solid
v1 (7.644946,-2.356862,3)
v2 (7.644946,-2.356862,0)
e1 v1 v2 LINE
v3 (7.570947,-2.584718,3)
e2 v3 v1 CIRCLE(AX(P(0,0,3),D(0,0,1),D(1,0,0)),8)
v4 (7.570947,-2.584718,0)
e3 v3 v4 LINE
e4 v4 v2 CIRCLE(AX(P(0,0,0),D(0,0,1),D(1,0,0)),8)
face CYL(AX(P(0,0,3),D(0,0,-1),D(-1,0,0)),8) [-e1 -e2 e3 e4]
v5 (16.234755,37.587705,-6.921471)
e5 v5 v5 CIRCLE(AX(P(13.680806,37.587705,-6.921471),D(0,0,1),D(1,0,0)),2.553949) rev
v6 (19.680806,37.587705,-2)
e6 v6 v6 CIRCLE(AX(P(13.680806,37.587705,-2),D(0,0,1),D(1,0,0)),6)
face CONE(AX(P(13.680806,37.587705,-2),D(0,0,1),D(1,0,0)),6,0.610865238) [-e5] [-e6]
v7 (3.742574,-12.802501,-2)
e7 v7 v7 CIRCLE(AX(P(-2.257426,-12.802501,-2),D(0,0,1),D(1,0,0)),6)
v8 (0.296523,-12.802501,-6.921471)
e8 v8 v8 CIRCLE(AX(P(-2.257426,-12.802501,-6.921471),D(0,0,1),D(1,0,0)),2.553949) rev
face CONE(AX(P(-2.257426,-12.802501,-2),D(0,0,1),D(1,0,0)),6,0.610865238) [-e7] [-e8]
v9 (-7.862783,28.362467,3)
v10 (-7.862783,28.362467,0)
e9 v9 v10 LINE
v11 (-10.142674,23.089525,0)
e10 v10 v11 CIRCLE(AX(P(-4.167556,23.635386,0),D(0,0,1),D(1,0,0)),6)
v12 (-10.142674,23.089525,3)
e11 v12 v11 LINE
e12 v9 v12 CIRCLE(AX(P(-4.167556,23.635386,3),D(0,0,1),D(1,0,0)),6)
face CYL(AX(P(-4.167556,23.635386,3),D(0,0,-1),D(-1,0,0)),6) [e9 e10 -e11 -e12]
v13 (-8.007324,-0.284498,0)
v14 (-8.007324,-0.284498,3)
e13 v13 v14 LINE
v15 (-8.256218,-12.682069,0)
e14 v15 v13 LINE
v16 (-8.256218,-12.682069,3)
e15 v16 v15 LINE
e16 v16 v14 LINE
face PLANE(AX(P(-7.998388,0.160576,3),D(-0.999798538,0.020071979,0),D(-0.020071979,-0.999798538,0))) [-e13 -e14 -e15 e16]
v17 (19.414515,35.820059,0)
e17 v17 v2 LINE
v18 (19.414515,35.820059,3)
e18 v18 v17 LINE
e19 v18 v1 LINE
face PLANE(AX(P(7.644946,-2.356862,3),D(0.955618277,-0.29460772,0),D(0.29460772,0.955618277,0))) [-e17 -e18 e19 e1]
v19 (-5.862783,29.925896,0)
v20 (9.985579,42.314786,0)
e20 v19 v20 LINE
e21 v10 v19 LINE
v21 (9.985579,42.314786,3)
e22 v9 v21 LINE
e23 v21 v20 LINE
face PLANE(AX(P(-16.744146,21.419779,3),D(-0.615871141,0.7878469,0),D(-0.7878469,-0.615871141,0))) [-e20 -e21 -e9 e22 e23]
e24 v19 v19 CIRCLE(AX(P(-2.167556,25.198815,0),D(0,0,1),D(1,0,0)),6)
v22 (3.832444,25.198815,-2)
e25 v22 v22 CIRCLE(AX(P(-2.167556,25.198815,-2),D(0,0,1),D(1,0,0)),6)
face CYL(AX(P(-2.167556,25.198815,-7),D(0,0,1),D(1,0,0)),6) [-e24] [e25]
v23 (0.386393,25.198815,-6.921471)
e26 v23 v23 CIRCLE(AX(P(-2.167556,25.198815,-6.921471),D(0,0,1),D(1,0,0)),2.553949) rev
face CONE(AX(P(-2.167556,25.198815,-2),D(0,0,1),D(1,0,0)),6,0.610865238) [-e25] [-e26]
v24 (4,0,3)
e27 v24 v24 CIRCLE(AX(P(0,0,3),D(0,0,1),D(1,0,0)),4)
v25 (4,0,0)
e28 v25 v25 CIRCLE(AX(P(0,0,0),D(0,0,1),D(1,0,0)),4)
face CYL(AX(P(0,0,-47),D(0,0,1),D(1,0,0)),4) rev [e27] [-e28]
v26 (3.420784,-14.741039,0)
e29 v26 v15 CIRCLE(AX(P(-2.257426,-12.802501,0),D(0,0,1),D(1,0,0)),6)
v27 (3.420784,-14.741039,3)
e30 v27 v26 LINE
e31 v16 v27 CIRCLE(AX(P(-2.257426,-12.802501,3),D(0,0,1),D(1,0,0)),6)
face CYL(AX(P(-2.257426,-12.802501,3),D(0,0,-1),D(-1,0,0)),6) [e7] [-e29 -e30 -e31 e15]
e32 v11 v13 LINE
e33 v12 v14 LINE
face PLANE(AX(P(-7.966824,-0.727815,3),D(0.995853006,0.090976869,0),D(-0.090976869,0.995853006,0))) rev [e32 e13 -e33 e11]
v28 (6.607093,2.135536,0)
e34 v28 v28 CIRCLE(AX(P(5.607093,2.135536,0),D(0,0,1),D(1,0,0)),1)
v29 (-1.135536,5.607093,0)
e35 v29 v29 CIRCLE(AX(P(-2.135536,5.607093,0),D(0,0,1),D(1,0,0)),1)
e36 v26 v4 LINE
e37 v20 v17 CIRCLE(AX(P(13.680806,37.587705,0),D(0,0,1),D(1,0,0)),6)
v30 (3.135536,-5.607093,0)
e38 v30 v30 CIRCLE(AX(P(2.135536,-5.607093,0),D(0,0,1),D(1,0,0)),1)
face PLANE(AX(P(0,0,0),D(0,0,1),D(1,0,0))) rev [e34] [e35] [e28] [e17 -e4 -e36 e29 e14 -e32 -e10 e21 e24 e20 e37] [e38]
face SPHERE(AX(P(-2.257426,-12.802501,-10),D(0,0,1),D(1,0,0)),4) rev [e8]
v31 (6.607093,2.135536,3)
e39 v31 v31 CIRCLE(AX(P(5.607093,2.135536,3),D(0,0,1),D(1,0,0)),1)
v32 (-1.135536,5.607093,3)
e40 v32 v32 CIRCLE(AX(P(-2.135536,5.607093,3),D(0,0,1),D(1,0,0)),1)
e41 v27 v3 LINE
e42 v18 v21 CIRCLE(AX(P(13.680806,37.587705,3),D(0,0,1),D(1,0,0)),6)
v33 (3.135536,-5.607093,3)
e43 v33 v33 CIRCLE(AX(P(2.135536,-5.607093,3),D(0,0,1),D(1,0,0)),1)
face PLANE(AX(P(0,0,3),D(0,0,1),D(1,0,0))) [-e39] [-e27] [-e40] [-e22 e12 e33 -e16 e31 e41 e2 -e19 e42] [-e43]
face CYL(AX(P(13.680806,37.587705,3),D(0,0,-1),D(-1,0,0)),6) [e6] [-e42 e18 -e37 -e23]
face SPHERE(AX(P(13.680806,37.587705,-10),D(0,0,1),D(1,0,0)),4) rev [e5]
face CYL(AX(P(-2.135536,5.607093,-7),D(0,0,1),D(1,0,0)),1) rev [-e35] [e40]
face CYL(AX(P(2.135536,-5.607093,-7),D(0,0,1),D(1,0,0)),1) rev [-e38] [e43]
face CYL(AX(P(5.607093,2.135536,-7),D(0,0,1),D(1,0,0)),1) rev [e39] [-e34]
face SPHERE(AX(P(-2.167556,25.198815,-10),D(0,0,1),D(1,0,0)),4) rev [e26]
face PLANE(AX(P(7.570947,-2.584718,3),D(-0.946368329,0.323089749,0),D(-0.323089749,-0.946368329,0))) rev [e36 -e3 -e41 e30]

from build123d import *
from build123d.topology import SkipClean

# Parameters (mm, degrees)
BOSS_EXTRUDE1_DEPTH = 3
BOSS_EXTRUDE2_DEPTH = 3
SKETCH3_R           = 4
CUT_EXTRUDE1_DEPTH  = 50
SKETCH4_R           = 1
CUT_EXTRUDE2_DEPTH  = 10
BOSS_EXTRUDE3_START = -7
SKETCH1_4_R         = 6
BOSS_EXTRUDE3_DEPTH = 7
BOSS_EXTRUDE4_START = -7
SKETCH2_4_R         = 6
BOSS_EXTRUDE4_DEPTH = 7
CHAMFER1_SIZE       = 5
CHAMFER1_SIZE_2     = 3.501037691


with BuildPart() as part:
    # Sketch1 → Boss-Extrude1 (new body)
    with BuildSketch(Plane.XY):
        with BuildLine():
            ThreePointArc((-7.862783113, 28.36246747), (-9.674812704, 26.016588816), (-10.142674299, 23.089524856))
            Line((-10.142674299, 23.089524856), (-7.966824047, -0.727814955))
            ThreePointArc((-7.966824047, -0.727814955), (-0.830270862, -7.956798998), (7.644946217, -2.356861757))
            Line((7.644946217, -2.356861757), (19.414515396, 35.820058514))
            ThreePointArc((19.414515396, 35.820058514), (17.084366379, 42.528936958), (9.985578884, 42.314786229))
            Line((9.985578884, 42.314786229), (-7.862783113, 28.36246747))
        make_face()
    extrude(amount=BOSS_EXTRUDE1_DEPTH)

    # Sketch2 → Boss-Extrude2 (add)
    with BuildSketch(Plane.XY):
        with BuildLine():
            Line((-7.9983883, 0.16057583), (-8.256217535, -12.682068917))
            ThreePointArc((-8.256217535, -12.682068917), (-3.299315376, -18.711347307), (3.420783665, -14.741039282))
            Line((3.420783665, -14.741039282), (7.570946632, -2.584717991))
            ThreePointArc((7.570946632, -2.584717991), (-1.389185421, -7.878462024), (-7.9983883, 0.16057583))
        make_face()
    extrude(amount=BOSS_EXTRUDE2_DEPTH)

    # Sketch3 → Cut-Extrude1 (cut)
    with BuildSketch(Plane.XY.offset(3)):
        Circle(SKETCH3_R)
    extrude(amount=-CUT_EXTRUDE1_DEPTH, mode=Mode.SUBTRACT)

    # Sketch4 → Cut-Extrude2 (cut)
    with BuildSketch(Plane.XY.offset(3)):
        with Locations((2.135535698, -5.607092587)):
            Circle(SKETCH4_R)
        with Locations((-2.135535698, 5.607092587)):
            Circle(SKETCH4_R)
        with Locations((5.607092587, 2.135535698)):
            Circle(SKETCH4_R)
    extrude(amount=-CUT_EXTRUDE2_DEPTH, mode=Mode.SUBTRACT)

    # Sketch1<4> → Boss-Extrude3 (add)
    with SkipClean():  # the faces are left unmerged after this step: merging them gives an invalid solid
        with BuildSketch(Plane.XY.offset(BOSS_EXTRUDE3_START)):
            with Locations(Location((13.680805733, 37.587704831, 0), (0, 0, 128.01524628))):
                Circle(SKETCH1_4_R)
            with Locations((-2.167556264, 25.198814555)):
                Circle(SKETCH1_4_R)
        extrude(amount=BOSS_EXTRUDE3_DEPTH)

    # Sketch2<4> → Boss-Extrude4 (add)
    with SkipClean():  # the faces are left unmerged after this step: merging them gives an invalid solid
        with BuildSketch(Plane.XY.offset(BOSS_EXTRUDE4_START)):
            with Locations(Location((-2.25742631, -12.802500789, 0), (0, 0, 178.849883098))):
                Circle(SKETCH2_4_R)
        extrude(amount=BOSS_EXTRUDE4_DEPTH)

    # Sketch5 one side → Cut-Revolve1 (revolve, cut)
    with SkipClean():  # the faces are left unmerged after this step: merging them gives an invalid solid
        with BuildSketch(Plane(origin=(13.680805733, 0, 0), x_dir=(0, 0, -1), z_dir=(1, 0, 0))):
            with BuildLine():
                ThreePointArc((10, 33.587704831), (12.828427125, 34.759277707), (14, 37.587704831))
                ThreePointArc((14, 37.587704831), (12.828427125, 40.416131956), (10, 41.587704831))
                Line((10, 41.587704831), (10, 33.587704831))
            make_face()
        revolve(axis=Axis((13.680805733, 41.587704831, -10), (0, -1, 0)), mode=Mode.SUBTRACT)

    # Sketch6 → Cut-Revolve2 (revolve, cut)
    with SkipClean():  # the faces are left unmerged after this step: merging them gives an invalid solid
        with BuildSketch(Plane(origin=(-2.167556264, 0, 0), x_dir=(0, 0, -1), z_dir=(1, 0, 0))):
            with BuildLine():
                ThreePointArc((14, 25.198814555), (12.828427125, 28.02724168), (10, 29.198814555))
                Line((10, 29.198814555), (10, 21.198814555))
                ThreePointArc((10, 21.198814555), (12.828427125, 22.37038743), (14, 25.198814555))
            make_face()
            with BuildLine():
                Line((10, 21.198814555), (10, 29.198814555))
                ThreePointArc((10, 29.198814555), (6, 25.198814555), (10, 21.198814555))
            make_face()
        revolve(axis=Axis((-2.167556264, 29.198814555, -10), (0, -1, 0)), mode=Mode.SUBTRACT)

    # Sketch7 → Cut-Revolve3 (revolve, cut)
    with SkipClean():  # the faces are left unmerged after this step: merging them gives an invalid solid
        with BuildSketch(Plane(origin=(-2.25742631, 0, 0), x_dir=(0, 0, -1), z_dir=(1, 0, 0))):
            with BuildLine():
                ThreePointArc((14, -12.802500789), (12.828427125, -9.974073664), (10, -8.802500789))
                Line((10, -8.802500789), (10, -16.802500789))
                ThreePointArc((10, -16.802500789), (12.828427125, -15.630927914), (14, -12.802500789))
            make_face()
            with BuildLine():
                Line((10, -16.802500789), (10, -8.802500789))
                ThreePointArc((10, -8.802500789), (6, -12.802500789), (10, -16.802500789))
            make_face()
        revolve(axis=Axis((-2.25742631, -8.802500789, -10), (0, -1, 0)), mode=Mode.SUBTRACT)

    # Chamfer1
    # the kernel refuses this chamfer: 5, 3.501037691 mm, written as the material it takes off along each edge
    with BuildSketch(Plane(origin=(-2.25742631, -12.802500789, -7), x_dir=(-0.9997985375420249, 0.020071978697384193, 0), z_dir=(0.020071978697384193, 0.9997985375420249, 0))) as chamfer1_piece_1:
        Polygon((6, CHAMFER1_SIZE), (6 - CHAMFER1_SIZE_2, 0), (6, 0), align=None)
    revolve(axis=Axis((-2.25742631, -12.802500789, -7), (0, 0, 1)), mode=Mode.SUBTRACT)
    with BuildSketch(Plane(origin=(13.680805733, 37.587704831, -7), x_dir=(-0.615871141442135, 0.7878468995552129, 0), z_dir=(0.7878468995552129, 0.615871141442135, 0))) as chamfer1_piece_2:
        Polygon((6, CHAMFER1_SIZE), (6 - CHAMFER1_SIZE_2, 0), (6, 0), align=None)
    revolve(axis=Axis((13.680805733, 37.587704831, -7), (0, 0, 1)), mode=Mode.SUBTRACT)
    with BuildSketch(Plane(origin=(-2.167556264, 25.198814555, -7), x_dir=(1, 0, 0), z_dir=(0, -1, 0))) as chamfer1_piece_3:
        Polygon((6, CHAMFER1_SIZE), (6 - CHAMFER1_SIZE_2, 0), (6, 0), align=None)
    revolve(axis=Axis((-2.167556264, 25.198814555, -7), (0, 0, 1)), mode=Mode.SUBTRACT)


solid = part.part
